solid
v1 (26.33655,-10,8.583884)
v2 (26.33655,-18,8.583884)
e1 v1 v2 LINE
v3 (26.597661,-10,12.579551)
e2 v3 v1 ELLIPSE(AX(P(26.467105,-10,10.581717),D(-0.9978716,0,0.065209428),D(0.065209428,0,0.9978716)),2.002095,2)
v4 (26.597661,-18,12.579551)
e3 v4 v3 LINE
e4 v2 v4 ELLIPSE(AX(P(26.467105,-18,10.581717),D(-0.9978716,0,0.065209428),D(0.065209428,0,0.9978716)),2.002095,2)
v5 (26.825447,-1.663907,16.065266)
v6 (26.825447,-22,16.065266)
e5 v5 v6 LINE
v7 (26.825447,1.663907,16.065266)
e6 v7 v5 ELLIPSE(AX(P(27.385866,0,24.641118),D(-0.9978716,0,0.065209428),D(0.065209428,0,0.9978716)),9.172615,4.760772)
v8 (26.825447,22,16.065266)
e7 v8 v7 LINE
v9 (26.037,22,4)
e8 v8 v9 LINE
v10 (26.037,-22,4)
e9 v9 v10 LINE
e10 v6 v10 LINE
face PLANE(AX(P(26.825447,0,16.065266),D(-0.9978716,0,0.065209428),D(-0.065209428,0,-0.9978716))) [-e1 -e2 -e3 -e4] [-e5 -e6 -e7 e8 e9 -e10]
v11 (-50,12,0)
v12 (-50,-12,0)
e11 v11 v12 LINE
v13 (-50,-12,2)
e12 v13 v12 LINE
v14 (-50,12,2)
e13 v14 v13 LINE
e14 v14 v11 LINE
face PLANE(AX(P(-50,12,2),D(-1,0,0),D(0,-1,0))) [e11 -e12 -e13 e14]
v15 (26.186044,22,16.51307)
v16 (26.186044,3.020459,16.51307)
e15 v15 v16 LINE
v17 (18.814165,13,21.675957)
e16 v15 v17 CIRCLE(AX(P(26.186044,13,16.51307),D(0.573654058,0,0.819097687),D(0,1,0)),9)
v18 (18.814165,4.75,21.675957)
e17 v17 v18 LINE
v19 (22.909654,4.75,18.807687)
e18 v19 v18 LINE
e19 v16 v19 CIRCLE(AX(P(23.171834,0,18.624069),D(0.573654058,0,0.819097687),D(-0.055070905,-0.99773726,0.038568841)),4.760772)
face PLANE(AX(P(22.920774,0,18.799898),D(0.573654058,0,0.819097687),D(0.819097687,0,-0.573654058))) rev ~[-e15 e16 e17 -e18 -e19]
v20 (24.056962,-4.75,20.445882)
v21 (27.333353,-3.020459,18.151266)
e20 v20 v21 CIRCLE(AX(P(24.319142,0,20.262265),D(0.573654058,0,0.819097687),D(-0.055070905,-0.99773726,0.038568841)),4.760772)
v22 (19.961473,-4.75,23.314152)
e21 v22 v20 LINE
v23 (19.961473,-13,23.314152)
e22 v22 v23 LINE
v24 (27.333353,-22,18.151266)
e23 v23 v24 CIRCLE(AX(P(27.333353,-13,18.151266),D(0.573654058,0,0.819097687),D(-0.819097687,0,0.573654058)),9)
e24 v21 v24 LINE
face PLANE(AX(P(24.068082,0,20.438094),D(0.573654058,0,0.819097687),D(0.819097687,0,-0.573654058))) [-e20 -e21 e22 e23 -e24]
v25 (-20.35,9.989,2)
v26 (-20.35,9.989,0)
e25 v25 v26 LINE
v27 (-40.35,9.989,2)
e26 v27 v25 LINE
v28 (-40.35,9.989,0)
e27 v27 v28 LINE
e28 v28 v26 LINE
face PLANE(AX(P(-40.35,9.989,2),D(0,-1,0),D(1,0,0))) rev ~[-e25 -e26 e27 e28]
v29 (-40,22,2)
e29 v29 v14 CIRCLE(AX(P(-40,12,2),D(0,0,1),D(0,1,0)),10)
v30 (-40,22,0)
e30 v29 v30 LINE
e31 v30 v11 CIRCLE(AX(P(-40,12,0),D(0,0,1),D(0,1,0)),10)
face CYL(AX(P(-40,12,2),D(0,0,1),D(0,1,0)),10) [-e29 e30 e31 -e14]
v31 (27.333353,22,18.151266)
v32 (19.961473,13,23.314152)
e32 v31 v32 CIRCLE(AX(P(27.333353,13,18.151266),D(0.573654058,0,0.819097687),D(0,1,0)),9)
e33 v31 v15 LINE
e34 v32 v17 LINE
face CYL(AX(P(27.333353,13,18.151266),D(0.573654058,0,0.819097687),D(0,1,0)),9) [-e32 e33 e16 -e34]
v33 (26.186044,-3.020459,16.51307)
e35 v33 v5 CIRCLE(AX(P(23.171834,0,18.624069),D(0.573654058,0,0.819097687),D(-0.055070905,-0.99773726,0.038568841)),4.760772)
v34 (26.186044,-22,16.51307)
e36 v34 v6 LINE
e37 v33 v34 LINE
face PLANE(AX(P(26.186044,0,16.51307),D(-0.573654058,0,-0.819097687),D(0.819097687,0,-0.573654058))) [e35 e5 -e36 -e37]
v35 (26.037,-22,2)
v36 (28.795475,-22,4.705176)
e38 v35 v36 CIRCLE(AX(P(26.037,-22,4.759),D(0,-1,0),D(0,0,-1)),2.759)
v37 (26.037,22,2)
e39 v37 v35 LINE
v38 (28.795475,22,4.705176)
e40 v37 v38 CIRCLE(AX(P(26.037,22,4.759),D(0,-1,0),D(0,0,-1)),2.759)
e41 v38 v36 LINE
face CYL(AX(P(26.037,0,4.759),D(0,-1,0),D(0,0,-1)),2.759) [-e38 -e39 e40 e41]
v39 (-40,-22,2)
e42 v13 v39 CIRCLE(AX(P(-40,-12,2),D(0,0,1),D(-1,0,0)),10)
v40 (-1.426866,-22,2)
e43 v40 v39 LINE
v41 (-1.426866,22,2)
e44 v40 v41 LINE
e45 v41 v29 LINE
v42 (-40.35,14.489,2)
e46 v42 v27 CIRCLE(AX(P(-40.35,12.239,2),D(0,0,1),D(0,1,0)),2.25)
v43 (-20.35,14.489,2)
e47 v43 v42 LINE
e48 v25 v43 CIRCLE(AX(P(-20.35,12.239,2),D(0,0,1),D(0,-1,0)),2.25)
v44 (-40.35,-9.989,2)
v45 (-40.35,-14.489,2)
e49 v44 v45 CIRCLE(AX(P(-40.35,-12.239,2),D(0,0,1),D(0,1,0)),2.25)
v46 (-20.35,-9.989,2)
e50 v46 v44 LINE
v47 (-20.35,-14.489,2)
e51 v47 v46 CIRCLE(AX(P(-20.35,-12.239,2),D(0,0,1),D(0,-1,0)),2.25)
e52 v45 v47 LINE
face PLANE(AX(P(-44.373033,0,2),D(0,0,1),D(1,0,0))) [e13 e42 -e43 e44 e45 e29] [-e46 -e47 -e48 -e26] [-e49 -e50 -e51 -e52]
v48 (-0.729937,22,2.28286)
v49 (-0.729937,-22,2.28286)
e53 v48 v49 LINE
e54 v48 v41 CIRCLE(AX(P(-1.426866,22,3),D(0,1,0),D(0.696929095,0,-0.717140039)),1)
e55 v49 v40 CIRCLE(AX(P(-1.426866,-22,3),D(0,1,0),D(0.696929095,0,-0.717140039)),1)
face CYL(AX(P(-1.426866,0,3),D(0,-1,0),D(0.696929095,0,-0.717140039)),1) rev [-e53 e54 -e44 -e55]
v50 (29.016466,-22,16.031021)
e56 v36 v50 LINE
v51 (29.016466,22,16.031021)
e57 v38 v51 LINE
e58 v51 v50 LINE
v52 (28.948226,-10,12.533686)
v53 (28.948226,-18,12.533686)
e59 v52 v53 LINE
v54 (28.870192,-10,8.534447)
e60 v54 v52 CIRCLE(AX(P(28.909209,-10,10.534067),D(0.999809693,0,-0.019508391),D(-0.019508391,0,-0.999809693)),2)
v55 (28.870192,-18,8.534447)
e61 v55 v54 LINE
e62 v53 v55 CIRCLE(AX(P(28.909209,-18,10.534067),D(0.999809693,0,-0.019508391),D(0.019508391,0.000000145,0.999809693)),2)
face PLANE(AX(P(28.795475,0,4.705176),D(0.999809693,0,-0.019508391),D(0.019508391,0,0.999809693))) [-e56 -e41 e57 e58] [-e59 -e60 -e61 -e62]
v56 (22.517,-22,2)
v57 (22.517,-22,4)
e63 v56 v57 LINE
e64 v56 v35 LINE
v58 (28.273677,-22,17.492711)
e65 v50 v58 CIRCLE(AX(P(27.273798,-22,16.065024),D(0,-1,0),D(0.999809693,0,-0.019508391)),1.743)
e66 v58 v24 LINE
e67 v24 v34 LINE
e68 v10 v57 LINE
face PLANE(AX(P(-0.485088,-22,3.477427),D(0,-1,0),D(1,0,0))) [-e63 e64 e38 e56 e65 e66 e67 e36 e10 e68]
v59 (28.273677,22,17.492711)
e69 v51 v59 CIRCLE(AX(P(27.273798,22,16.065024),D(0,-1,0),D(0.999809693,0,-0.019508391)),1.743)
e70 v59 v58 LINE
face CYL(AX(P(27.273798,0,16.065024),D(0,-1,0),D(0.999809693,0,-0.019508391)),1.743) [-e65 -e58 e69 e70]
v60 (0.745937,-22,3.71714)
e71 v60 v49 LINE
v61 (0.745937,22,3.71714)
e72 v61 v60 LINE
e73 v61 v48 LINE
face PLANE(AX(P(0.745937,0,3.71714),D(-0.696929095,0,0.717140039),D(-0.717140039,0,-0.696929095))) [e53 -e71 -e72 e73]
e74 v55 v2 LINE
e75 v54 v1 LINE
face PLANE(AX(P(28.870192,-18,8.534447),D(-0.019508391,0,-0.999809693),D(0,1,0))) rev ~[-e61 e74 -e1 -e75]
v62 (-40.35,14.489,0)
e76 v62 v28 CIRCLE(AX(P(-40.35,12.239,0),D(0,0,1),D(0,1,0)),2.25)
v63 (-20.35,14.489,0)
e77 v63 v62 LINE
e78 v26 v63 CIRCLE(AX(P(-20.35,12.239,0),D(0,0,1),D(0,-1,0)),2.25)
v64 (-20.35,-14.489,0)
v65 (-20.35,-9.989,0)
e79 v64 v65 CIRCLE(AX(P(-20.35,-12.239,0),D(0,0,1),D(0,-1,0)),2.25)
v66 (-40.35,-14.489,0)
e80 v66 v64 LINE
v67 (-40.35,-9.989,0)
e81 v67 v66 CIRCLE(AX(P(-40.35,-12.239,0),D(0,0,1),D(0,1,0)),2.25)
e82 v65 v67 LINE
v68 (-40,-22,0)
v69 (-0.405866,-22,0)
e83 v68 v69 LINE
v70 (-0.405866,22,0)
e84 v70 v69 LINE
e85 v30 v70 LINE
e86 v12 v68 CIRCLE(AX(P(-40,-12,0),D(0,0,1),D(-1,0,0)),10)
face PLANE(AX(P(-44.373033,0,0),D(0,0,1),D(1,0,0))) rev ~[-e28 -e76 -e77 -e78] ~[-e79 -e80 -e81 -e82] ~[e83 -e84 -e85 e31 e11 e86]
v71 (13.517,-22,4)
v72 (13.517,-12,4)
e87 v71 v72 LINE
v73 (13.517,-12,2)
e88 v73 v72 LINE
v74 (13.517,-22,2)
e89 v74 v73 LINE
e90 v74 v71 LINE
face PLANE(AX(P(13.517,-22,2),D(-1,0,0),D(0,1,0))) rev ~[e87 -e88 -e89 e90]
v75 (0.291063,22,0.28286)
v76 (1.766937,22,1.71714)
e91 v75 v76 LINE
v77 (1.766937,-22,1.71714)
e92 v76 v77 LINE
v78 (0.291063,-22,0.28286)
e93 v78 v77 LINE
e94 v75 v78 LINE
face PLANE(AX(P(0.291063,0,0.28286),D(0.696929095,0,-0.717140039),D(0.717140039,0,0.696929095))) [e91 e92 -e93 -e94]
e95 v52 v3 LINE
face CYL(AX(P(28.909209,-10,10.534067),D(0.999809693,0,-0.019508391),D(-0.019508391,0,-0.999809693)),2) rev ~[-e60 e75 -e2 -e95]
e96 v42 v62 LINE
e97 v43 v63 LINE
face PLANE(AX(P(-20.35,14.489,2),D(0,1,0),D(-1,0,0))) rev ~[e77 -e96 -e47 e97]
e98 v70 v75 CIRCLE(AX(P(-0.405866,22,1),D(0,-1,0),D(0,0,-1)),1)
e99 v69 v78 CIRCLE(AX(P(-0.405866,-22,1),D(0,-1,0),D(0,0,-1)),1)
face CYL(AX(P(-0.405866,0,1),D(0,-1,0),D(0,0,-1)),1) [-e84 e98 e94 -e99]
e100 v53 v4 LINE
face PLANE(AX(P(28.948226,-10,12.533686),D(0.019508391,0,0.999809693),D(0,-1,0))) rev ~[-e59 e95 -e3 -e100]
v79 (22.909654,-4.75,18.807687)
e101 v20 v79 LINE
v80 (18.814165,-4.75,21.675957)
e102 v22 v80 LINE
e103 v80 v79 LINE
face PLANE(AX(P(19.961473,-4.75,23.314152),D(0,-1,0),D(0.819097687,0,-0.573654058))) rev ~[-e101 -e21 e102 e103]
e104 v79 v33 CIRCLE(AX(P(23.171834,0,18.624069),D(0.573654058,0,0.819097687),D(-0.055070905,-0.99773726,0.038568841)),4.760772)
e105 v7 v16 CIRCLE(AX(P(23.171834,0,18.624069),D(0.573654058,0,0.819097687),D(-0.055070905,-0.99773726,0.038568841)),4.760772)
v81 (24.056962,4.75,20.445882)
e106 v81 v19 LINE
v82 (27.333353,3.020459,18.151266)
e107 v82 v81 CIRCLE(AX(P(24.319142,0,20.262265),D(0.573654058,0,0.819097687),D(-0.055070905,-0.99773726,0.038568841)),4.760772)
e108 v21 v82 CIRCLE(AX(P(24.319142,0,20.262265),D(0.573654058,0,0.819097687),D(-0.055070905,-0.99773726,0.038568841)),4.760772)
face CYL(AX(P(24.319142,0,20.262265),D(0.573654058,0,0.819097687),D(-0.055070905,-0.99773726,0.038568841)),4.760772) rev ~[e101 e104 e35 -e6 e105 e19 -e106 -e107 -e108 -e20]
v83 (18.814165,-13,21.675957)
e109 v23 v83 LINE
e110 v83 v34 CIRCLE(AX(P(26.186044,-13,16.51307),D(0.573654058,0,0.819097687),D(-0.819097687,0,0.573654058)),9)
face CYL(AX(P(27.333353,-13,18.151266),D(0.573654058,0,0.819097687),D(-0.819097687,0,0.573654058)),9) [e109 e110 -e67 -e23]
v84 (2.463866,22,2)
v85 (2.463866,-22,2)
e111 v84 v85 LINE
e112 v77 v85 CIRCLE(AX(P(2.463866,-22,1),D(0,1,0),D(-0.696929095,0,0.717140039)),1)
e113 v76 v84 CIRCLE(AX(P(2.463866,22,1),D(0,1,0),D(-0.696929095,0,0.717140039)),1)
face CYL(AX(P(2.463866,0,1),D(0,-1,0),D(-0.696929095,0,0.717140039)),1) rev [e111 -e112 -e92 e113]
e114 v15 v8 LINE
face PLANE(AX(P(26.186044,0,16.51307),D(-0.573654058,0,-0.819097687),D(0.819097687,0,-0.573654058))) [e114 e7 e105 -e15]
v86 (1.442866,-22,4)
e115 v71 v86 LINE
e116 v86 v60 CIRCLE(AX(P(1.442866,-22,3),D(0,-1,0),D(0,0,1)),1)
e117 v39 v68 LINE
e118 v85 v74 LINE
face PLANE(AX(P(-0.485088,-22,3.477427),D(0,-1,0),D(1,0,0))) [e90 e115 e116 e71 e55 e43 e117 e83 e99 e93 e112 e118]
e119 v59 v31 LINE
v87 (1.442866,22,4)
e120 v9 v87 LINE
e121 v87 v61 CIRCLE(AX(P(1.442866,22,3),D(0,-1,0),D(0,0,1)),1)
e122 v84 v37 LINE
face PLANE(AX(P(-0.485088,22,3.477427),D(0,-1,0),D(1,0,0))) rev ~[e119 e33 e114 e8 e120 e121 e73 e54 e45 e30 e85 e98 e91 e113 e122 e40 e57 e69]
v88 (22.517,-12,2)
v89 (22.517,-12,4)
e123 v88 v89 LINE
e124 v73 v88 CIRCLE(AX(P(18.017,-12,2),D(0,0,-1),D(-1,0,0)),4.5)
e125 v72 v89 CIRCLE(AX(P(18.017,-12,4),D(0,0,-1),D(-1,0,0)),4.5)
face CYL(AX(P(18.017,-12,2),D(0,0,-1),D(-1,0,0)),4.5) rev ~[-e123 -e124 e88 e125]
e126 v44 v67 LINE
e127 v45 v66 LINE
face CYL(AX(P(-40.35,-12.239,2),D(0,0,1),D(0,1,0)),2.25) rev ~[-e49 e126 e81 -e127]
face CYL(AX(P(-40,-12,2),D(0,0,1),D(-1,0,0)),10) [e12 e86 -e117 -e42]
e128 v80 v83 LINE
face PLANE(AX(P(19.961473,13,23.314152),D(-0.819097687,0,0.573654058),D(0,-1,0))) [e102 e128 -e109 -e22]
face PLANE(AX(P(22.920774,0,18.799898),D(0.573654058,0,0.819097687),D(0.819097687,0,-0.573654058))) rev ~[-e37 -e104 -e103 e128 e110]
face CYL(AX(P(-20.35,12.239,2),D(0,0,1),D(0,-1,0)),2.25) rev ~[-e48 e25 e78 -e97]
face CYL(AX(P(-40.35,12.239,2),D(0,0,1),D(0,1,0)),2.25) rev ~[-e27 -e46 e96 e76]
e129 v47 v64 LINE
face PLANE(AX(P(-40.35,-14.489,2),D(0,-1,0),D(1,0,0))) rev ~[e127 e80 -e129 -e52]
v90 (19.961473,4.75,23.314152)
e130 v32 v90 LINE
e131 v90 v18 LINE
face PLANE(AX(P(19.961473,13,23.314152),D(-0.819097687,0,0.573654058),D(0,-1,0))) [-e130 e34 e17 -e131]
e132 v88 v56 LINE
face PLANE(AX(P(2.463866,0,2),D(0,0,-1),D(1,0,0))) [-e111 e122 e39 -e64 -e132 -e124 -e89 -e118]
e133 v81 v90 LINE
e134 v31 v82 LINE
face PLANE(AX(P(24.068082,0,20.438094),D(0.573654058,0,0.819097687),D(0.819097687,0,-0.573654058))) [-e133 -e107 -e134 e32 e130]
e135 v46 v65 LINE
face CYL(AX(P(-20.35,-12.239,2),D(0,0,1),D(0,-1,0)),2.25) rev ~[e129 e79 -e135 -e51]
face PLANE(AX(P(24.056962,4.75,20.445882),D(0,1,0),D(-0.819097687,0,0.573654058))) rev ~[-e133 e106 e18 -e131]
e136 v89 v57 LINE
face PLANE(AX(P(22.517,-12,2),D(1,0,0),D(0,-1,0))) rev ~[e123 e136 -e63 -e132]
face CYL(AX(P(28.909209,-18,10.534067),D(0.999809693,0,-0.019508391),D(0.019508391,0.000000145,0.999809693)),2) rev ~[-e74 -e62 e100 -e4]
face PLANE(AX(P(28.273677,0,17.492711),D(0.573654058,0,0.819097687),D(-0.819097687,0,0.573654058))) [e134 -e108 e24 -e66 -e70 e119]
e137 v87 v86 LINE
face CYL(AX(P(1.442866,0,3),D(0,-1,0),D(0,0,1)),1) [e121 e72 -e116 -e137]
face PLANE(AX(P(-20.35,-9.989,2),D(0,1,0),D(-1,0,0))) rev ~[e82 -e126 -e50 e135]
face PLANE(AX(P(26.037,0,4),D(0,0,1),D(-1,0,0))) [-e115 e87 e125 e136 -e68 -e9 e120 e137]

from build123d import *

# Parameters (mm, degrees)
F1_DEPTH  = 22
F3_DEPTH  = 2
F5_DEPTH  = 25
F7_DEPTH  = 25
F9_DEPTH  = 2
F11_DEPTH = 2.4954547296
F13_DEPTH = 2
F14_DEPTH = 25


# Not quite as in the source:
# - a feature names something its author has since deleted; it is built from what else it names


with BuildPart() as f1:
    # F0 (on Front) → F1 (new body, symmetric)
    with BuildSketch(Plane.XZ):
        with BuildLine():
            Line((-40, 0), (-0.4058661959, 0))
            ThreePointArc((-0.4058661959, 0), (-0.0297944203, 0.073409465), (0.2910628996, 0.2828599608))
            Line((0.2910628996, 0.2828599608), (1.7669371004, 1.7171400392))
            ThreePointArc((1.7669371004, 1.7171400392), (2.0877944203, 1.926590535), (2.4638661959, 2))
            Line((2.4638661959, 2), (26.037, 2))
            ThreePointArc((26.037, 2), (27.9687843496, 2.7891547709), (28.7954749436, 4.705176349))
            Line((28.7954749436, 4.705176349), (29.016465998, 16.0310205539))
            ThreePointArc((29.016465998, 16.0310205539), (28.8276722638, 16.8546583092), (28.2736767263, 17.4927109486))
            Line((28.2736767263, 17.4927109486), (27.3333525812, 18.1512658075))
            Line((27.3333525812, 18.1512658075), (26.1860444646, 16.5130704329))
            Line((26.1860444646, 16.5130704329), (26.8254471929, 16.0652655182))
            Line((26.8254471929, 16.0652655182), (26.037, 4))
            Line((26.037, 4), (1.4428661959, 4))
            ThreePointArc((1.4428661959, 4), (1.0667944203, 3.926590535), (0.7459371004, 3.7171400392))
            Line((0.7459371004, 3.7171400392), (-0.7299371004, 2.2828599608))
            ThreePointArc((-0.7299371004, 2.2828599608), (-1.0507944203, 2.073409465), (-1.4268661959, 2))
            Line((-1.4268661959, 2), (-40, 2))
            Line((-40, 2), (-40, 0))
        make_face()
    extrude(amount=F1_DEPTH, both=True)

    # F2 (on face) → F3 (join)
    with BuildSketch(Plane.XY.offset(2)):
        with BuildLine():
            Line((-50, 12), (-50, -12))
            ThreePointArc((-50, -12), (-47.0710678119, -19.0710678119), (-40, -22))
            Line((-40, -22), (-40, 22))
            ThreePointArc((-40, 22), (-47.0710678119, 19.0710678119), (-50, 12))
        make_face()
    extrude(amount=-F3_DEPTH)

    # F4 (on face) → F5 (cut)
    with BuildSketch(Plane.XY.offset(2)):
        with BuildLine():
            ThreePointArc((-40.35, 14.489), (-42.6, 12.239), (-40.35, 9.989))
            Line((-40.35, 9.989), (-20.35, 9.989))
            ThreePointArc((-20.35, 9.989), (-18.1, 12.239), (-20.35, 14.489))
            Line((-20.35, 14.489), (-40.35, 14.489))
        make_face()
    extrude(amount=-F5_DEPTH, mode=Mode.SUBTRACT)

    # F6 (on face) → F7 (cut)
    with BuildSketch(Plane(origin=(28.6927430868, 0, -0.5598557981), x_dir=(0, 1, 0), z_dir=(0.9998096932, 0, -0.0195083911))):
        with BuildLine():
            Line((-9.9999997095, 13.096034309), (-17.9999997095, 13.096034309))
            ThreePointArc((-17.9999997095, 13.096034309), (-20, 11.0960344543), (-18, 9.096034309))
            Line((-18, 9.096034309), (-9.9999997095, 9.096034309))
            ThreePointArc((-9.9999997095, 9.096034309), (-7.9999997095, 11.096034309), (-9.9999997095, 13.096034309))
        make_face()
    extrude(amount=-F7_DEPTH, mode=Mode.SUBTRACT)

    # F8 (on face) → F9 (join)
    with BuildSketch(Plane(origin=(17.5237251574, 0, 25.0214263138), x_dir=(0.8190976873, 0, -0.5736540583), z_dir=(0.5736540583, 0, 0.8190976873))):
        with BuildLine():
            Line((2.9761385921, 13), (2.9761385921, -13))
            ThreePointArc((2.9761385921, -13), (5.6121775614, -19.3639610307), (11.9761385921, -22))
            Line((11.9761385921, -22), (11.9761385921, 22))
            ThreePointArc((11.9761385921, 22), (5.6121775614, 19.3639610307), (2.9761385921, 13))
        make_face()
    extrude(amount=-F9_DEPTH)

    # F10 (on face) → F11 (cut, through all)
    with BuildSketch(Plane(origin=(17.5237251574, 0, 25.0214263138), x_dir=(0.8190976873, 0, -0.5736540583), z_dir=(0.5736540583, 0, 0.8190976873))):
        with BuildLine():
            Line((2.9761385921, 4.75), (2.9761385921, -4.75))
            Line((2.9761385921, -4.75), (7.9761385921, -4.75))
            ThreePointArc((7.9761385921, -4.75), (13.0569949576, 0), (7.9761385921, 4.75))
            Line((7.9761385921, 4.75), (2.9761385921, 4.75))
        make_face()
    extrude(amount=-F11_DEPTH, mode=Mode.SUBTRACT)

    # F12 (on face) → F13 (cut, through all)
    with BuildSketch(Plane(origin=(0, 0, 2), x_dir=(1, 0, 0), z_dir=(0, 0, -1))):
        with BuildLine():
            Line((22.517, 12), (22.517, 22))
            Line((22.517, 22), (13.517, 22))
            Line((13.517, 22), (13.517, 12))
            ThreePointArc((13.517, 12), (18.017, 7.5), (22.517, 12))
        make_face()
    extrude(amount=-F13_DEPTH, mode=Mode.SUBTRACT)

    # F4 (on face) → F14 (cut)
    with BuildSketch(Plane.XY.offset(2)):
        with BuildLine():
            Line((-20.35, -9.989), (-40.35, -9.989))
            ThreePointArc((-40.35, -9.989), (-42.6, -12.239), (-40.35, -14.489))
            Line((-40.35, -14.489), (-20.35, -14.489))
            ThreePointArc((-20.35, -14.489), (-18.1, -12.239), (-20.35, -9.989))
        make_face()
    extrude(amount=-F14_DEPTH, mode=Mode.SUBTRACT)


solid = f1.part
